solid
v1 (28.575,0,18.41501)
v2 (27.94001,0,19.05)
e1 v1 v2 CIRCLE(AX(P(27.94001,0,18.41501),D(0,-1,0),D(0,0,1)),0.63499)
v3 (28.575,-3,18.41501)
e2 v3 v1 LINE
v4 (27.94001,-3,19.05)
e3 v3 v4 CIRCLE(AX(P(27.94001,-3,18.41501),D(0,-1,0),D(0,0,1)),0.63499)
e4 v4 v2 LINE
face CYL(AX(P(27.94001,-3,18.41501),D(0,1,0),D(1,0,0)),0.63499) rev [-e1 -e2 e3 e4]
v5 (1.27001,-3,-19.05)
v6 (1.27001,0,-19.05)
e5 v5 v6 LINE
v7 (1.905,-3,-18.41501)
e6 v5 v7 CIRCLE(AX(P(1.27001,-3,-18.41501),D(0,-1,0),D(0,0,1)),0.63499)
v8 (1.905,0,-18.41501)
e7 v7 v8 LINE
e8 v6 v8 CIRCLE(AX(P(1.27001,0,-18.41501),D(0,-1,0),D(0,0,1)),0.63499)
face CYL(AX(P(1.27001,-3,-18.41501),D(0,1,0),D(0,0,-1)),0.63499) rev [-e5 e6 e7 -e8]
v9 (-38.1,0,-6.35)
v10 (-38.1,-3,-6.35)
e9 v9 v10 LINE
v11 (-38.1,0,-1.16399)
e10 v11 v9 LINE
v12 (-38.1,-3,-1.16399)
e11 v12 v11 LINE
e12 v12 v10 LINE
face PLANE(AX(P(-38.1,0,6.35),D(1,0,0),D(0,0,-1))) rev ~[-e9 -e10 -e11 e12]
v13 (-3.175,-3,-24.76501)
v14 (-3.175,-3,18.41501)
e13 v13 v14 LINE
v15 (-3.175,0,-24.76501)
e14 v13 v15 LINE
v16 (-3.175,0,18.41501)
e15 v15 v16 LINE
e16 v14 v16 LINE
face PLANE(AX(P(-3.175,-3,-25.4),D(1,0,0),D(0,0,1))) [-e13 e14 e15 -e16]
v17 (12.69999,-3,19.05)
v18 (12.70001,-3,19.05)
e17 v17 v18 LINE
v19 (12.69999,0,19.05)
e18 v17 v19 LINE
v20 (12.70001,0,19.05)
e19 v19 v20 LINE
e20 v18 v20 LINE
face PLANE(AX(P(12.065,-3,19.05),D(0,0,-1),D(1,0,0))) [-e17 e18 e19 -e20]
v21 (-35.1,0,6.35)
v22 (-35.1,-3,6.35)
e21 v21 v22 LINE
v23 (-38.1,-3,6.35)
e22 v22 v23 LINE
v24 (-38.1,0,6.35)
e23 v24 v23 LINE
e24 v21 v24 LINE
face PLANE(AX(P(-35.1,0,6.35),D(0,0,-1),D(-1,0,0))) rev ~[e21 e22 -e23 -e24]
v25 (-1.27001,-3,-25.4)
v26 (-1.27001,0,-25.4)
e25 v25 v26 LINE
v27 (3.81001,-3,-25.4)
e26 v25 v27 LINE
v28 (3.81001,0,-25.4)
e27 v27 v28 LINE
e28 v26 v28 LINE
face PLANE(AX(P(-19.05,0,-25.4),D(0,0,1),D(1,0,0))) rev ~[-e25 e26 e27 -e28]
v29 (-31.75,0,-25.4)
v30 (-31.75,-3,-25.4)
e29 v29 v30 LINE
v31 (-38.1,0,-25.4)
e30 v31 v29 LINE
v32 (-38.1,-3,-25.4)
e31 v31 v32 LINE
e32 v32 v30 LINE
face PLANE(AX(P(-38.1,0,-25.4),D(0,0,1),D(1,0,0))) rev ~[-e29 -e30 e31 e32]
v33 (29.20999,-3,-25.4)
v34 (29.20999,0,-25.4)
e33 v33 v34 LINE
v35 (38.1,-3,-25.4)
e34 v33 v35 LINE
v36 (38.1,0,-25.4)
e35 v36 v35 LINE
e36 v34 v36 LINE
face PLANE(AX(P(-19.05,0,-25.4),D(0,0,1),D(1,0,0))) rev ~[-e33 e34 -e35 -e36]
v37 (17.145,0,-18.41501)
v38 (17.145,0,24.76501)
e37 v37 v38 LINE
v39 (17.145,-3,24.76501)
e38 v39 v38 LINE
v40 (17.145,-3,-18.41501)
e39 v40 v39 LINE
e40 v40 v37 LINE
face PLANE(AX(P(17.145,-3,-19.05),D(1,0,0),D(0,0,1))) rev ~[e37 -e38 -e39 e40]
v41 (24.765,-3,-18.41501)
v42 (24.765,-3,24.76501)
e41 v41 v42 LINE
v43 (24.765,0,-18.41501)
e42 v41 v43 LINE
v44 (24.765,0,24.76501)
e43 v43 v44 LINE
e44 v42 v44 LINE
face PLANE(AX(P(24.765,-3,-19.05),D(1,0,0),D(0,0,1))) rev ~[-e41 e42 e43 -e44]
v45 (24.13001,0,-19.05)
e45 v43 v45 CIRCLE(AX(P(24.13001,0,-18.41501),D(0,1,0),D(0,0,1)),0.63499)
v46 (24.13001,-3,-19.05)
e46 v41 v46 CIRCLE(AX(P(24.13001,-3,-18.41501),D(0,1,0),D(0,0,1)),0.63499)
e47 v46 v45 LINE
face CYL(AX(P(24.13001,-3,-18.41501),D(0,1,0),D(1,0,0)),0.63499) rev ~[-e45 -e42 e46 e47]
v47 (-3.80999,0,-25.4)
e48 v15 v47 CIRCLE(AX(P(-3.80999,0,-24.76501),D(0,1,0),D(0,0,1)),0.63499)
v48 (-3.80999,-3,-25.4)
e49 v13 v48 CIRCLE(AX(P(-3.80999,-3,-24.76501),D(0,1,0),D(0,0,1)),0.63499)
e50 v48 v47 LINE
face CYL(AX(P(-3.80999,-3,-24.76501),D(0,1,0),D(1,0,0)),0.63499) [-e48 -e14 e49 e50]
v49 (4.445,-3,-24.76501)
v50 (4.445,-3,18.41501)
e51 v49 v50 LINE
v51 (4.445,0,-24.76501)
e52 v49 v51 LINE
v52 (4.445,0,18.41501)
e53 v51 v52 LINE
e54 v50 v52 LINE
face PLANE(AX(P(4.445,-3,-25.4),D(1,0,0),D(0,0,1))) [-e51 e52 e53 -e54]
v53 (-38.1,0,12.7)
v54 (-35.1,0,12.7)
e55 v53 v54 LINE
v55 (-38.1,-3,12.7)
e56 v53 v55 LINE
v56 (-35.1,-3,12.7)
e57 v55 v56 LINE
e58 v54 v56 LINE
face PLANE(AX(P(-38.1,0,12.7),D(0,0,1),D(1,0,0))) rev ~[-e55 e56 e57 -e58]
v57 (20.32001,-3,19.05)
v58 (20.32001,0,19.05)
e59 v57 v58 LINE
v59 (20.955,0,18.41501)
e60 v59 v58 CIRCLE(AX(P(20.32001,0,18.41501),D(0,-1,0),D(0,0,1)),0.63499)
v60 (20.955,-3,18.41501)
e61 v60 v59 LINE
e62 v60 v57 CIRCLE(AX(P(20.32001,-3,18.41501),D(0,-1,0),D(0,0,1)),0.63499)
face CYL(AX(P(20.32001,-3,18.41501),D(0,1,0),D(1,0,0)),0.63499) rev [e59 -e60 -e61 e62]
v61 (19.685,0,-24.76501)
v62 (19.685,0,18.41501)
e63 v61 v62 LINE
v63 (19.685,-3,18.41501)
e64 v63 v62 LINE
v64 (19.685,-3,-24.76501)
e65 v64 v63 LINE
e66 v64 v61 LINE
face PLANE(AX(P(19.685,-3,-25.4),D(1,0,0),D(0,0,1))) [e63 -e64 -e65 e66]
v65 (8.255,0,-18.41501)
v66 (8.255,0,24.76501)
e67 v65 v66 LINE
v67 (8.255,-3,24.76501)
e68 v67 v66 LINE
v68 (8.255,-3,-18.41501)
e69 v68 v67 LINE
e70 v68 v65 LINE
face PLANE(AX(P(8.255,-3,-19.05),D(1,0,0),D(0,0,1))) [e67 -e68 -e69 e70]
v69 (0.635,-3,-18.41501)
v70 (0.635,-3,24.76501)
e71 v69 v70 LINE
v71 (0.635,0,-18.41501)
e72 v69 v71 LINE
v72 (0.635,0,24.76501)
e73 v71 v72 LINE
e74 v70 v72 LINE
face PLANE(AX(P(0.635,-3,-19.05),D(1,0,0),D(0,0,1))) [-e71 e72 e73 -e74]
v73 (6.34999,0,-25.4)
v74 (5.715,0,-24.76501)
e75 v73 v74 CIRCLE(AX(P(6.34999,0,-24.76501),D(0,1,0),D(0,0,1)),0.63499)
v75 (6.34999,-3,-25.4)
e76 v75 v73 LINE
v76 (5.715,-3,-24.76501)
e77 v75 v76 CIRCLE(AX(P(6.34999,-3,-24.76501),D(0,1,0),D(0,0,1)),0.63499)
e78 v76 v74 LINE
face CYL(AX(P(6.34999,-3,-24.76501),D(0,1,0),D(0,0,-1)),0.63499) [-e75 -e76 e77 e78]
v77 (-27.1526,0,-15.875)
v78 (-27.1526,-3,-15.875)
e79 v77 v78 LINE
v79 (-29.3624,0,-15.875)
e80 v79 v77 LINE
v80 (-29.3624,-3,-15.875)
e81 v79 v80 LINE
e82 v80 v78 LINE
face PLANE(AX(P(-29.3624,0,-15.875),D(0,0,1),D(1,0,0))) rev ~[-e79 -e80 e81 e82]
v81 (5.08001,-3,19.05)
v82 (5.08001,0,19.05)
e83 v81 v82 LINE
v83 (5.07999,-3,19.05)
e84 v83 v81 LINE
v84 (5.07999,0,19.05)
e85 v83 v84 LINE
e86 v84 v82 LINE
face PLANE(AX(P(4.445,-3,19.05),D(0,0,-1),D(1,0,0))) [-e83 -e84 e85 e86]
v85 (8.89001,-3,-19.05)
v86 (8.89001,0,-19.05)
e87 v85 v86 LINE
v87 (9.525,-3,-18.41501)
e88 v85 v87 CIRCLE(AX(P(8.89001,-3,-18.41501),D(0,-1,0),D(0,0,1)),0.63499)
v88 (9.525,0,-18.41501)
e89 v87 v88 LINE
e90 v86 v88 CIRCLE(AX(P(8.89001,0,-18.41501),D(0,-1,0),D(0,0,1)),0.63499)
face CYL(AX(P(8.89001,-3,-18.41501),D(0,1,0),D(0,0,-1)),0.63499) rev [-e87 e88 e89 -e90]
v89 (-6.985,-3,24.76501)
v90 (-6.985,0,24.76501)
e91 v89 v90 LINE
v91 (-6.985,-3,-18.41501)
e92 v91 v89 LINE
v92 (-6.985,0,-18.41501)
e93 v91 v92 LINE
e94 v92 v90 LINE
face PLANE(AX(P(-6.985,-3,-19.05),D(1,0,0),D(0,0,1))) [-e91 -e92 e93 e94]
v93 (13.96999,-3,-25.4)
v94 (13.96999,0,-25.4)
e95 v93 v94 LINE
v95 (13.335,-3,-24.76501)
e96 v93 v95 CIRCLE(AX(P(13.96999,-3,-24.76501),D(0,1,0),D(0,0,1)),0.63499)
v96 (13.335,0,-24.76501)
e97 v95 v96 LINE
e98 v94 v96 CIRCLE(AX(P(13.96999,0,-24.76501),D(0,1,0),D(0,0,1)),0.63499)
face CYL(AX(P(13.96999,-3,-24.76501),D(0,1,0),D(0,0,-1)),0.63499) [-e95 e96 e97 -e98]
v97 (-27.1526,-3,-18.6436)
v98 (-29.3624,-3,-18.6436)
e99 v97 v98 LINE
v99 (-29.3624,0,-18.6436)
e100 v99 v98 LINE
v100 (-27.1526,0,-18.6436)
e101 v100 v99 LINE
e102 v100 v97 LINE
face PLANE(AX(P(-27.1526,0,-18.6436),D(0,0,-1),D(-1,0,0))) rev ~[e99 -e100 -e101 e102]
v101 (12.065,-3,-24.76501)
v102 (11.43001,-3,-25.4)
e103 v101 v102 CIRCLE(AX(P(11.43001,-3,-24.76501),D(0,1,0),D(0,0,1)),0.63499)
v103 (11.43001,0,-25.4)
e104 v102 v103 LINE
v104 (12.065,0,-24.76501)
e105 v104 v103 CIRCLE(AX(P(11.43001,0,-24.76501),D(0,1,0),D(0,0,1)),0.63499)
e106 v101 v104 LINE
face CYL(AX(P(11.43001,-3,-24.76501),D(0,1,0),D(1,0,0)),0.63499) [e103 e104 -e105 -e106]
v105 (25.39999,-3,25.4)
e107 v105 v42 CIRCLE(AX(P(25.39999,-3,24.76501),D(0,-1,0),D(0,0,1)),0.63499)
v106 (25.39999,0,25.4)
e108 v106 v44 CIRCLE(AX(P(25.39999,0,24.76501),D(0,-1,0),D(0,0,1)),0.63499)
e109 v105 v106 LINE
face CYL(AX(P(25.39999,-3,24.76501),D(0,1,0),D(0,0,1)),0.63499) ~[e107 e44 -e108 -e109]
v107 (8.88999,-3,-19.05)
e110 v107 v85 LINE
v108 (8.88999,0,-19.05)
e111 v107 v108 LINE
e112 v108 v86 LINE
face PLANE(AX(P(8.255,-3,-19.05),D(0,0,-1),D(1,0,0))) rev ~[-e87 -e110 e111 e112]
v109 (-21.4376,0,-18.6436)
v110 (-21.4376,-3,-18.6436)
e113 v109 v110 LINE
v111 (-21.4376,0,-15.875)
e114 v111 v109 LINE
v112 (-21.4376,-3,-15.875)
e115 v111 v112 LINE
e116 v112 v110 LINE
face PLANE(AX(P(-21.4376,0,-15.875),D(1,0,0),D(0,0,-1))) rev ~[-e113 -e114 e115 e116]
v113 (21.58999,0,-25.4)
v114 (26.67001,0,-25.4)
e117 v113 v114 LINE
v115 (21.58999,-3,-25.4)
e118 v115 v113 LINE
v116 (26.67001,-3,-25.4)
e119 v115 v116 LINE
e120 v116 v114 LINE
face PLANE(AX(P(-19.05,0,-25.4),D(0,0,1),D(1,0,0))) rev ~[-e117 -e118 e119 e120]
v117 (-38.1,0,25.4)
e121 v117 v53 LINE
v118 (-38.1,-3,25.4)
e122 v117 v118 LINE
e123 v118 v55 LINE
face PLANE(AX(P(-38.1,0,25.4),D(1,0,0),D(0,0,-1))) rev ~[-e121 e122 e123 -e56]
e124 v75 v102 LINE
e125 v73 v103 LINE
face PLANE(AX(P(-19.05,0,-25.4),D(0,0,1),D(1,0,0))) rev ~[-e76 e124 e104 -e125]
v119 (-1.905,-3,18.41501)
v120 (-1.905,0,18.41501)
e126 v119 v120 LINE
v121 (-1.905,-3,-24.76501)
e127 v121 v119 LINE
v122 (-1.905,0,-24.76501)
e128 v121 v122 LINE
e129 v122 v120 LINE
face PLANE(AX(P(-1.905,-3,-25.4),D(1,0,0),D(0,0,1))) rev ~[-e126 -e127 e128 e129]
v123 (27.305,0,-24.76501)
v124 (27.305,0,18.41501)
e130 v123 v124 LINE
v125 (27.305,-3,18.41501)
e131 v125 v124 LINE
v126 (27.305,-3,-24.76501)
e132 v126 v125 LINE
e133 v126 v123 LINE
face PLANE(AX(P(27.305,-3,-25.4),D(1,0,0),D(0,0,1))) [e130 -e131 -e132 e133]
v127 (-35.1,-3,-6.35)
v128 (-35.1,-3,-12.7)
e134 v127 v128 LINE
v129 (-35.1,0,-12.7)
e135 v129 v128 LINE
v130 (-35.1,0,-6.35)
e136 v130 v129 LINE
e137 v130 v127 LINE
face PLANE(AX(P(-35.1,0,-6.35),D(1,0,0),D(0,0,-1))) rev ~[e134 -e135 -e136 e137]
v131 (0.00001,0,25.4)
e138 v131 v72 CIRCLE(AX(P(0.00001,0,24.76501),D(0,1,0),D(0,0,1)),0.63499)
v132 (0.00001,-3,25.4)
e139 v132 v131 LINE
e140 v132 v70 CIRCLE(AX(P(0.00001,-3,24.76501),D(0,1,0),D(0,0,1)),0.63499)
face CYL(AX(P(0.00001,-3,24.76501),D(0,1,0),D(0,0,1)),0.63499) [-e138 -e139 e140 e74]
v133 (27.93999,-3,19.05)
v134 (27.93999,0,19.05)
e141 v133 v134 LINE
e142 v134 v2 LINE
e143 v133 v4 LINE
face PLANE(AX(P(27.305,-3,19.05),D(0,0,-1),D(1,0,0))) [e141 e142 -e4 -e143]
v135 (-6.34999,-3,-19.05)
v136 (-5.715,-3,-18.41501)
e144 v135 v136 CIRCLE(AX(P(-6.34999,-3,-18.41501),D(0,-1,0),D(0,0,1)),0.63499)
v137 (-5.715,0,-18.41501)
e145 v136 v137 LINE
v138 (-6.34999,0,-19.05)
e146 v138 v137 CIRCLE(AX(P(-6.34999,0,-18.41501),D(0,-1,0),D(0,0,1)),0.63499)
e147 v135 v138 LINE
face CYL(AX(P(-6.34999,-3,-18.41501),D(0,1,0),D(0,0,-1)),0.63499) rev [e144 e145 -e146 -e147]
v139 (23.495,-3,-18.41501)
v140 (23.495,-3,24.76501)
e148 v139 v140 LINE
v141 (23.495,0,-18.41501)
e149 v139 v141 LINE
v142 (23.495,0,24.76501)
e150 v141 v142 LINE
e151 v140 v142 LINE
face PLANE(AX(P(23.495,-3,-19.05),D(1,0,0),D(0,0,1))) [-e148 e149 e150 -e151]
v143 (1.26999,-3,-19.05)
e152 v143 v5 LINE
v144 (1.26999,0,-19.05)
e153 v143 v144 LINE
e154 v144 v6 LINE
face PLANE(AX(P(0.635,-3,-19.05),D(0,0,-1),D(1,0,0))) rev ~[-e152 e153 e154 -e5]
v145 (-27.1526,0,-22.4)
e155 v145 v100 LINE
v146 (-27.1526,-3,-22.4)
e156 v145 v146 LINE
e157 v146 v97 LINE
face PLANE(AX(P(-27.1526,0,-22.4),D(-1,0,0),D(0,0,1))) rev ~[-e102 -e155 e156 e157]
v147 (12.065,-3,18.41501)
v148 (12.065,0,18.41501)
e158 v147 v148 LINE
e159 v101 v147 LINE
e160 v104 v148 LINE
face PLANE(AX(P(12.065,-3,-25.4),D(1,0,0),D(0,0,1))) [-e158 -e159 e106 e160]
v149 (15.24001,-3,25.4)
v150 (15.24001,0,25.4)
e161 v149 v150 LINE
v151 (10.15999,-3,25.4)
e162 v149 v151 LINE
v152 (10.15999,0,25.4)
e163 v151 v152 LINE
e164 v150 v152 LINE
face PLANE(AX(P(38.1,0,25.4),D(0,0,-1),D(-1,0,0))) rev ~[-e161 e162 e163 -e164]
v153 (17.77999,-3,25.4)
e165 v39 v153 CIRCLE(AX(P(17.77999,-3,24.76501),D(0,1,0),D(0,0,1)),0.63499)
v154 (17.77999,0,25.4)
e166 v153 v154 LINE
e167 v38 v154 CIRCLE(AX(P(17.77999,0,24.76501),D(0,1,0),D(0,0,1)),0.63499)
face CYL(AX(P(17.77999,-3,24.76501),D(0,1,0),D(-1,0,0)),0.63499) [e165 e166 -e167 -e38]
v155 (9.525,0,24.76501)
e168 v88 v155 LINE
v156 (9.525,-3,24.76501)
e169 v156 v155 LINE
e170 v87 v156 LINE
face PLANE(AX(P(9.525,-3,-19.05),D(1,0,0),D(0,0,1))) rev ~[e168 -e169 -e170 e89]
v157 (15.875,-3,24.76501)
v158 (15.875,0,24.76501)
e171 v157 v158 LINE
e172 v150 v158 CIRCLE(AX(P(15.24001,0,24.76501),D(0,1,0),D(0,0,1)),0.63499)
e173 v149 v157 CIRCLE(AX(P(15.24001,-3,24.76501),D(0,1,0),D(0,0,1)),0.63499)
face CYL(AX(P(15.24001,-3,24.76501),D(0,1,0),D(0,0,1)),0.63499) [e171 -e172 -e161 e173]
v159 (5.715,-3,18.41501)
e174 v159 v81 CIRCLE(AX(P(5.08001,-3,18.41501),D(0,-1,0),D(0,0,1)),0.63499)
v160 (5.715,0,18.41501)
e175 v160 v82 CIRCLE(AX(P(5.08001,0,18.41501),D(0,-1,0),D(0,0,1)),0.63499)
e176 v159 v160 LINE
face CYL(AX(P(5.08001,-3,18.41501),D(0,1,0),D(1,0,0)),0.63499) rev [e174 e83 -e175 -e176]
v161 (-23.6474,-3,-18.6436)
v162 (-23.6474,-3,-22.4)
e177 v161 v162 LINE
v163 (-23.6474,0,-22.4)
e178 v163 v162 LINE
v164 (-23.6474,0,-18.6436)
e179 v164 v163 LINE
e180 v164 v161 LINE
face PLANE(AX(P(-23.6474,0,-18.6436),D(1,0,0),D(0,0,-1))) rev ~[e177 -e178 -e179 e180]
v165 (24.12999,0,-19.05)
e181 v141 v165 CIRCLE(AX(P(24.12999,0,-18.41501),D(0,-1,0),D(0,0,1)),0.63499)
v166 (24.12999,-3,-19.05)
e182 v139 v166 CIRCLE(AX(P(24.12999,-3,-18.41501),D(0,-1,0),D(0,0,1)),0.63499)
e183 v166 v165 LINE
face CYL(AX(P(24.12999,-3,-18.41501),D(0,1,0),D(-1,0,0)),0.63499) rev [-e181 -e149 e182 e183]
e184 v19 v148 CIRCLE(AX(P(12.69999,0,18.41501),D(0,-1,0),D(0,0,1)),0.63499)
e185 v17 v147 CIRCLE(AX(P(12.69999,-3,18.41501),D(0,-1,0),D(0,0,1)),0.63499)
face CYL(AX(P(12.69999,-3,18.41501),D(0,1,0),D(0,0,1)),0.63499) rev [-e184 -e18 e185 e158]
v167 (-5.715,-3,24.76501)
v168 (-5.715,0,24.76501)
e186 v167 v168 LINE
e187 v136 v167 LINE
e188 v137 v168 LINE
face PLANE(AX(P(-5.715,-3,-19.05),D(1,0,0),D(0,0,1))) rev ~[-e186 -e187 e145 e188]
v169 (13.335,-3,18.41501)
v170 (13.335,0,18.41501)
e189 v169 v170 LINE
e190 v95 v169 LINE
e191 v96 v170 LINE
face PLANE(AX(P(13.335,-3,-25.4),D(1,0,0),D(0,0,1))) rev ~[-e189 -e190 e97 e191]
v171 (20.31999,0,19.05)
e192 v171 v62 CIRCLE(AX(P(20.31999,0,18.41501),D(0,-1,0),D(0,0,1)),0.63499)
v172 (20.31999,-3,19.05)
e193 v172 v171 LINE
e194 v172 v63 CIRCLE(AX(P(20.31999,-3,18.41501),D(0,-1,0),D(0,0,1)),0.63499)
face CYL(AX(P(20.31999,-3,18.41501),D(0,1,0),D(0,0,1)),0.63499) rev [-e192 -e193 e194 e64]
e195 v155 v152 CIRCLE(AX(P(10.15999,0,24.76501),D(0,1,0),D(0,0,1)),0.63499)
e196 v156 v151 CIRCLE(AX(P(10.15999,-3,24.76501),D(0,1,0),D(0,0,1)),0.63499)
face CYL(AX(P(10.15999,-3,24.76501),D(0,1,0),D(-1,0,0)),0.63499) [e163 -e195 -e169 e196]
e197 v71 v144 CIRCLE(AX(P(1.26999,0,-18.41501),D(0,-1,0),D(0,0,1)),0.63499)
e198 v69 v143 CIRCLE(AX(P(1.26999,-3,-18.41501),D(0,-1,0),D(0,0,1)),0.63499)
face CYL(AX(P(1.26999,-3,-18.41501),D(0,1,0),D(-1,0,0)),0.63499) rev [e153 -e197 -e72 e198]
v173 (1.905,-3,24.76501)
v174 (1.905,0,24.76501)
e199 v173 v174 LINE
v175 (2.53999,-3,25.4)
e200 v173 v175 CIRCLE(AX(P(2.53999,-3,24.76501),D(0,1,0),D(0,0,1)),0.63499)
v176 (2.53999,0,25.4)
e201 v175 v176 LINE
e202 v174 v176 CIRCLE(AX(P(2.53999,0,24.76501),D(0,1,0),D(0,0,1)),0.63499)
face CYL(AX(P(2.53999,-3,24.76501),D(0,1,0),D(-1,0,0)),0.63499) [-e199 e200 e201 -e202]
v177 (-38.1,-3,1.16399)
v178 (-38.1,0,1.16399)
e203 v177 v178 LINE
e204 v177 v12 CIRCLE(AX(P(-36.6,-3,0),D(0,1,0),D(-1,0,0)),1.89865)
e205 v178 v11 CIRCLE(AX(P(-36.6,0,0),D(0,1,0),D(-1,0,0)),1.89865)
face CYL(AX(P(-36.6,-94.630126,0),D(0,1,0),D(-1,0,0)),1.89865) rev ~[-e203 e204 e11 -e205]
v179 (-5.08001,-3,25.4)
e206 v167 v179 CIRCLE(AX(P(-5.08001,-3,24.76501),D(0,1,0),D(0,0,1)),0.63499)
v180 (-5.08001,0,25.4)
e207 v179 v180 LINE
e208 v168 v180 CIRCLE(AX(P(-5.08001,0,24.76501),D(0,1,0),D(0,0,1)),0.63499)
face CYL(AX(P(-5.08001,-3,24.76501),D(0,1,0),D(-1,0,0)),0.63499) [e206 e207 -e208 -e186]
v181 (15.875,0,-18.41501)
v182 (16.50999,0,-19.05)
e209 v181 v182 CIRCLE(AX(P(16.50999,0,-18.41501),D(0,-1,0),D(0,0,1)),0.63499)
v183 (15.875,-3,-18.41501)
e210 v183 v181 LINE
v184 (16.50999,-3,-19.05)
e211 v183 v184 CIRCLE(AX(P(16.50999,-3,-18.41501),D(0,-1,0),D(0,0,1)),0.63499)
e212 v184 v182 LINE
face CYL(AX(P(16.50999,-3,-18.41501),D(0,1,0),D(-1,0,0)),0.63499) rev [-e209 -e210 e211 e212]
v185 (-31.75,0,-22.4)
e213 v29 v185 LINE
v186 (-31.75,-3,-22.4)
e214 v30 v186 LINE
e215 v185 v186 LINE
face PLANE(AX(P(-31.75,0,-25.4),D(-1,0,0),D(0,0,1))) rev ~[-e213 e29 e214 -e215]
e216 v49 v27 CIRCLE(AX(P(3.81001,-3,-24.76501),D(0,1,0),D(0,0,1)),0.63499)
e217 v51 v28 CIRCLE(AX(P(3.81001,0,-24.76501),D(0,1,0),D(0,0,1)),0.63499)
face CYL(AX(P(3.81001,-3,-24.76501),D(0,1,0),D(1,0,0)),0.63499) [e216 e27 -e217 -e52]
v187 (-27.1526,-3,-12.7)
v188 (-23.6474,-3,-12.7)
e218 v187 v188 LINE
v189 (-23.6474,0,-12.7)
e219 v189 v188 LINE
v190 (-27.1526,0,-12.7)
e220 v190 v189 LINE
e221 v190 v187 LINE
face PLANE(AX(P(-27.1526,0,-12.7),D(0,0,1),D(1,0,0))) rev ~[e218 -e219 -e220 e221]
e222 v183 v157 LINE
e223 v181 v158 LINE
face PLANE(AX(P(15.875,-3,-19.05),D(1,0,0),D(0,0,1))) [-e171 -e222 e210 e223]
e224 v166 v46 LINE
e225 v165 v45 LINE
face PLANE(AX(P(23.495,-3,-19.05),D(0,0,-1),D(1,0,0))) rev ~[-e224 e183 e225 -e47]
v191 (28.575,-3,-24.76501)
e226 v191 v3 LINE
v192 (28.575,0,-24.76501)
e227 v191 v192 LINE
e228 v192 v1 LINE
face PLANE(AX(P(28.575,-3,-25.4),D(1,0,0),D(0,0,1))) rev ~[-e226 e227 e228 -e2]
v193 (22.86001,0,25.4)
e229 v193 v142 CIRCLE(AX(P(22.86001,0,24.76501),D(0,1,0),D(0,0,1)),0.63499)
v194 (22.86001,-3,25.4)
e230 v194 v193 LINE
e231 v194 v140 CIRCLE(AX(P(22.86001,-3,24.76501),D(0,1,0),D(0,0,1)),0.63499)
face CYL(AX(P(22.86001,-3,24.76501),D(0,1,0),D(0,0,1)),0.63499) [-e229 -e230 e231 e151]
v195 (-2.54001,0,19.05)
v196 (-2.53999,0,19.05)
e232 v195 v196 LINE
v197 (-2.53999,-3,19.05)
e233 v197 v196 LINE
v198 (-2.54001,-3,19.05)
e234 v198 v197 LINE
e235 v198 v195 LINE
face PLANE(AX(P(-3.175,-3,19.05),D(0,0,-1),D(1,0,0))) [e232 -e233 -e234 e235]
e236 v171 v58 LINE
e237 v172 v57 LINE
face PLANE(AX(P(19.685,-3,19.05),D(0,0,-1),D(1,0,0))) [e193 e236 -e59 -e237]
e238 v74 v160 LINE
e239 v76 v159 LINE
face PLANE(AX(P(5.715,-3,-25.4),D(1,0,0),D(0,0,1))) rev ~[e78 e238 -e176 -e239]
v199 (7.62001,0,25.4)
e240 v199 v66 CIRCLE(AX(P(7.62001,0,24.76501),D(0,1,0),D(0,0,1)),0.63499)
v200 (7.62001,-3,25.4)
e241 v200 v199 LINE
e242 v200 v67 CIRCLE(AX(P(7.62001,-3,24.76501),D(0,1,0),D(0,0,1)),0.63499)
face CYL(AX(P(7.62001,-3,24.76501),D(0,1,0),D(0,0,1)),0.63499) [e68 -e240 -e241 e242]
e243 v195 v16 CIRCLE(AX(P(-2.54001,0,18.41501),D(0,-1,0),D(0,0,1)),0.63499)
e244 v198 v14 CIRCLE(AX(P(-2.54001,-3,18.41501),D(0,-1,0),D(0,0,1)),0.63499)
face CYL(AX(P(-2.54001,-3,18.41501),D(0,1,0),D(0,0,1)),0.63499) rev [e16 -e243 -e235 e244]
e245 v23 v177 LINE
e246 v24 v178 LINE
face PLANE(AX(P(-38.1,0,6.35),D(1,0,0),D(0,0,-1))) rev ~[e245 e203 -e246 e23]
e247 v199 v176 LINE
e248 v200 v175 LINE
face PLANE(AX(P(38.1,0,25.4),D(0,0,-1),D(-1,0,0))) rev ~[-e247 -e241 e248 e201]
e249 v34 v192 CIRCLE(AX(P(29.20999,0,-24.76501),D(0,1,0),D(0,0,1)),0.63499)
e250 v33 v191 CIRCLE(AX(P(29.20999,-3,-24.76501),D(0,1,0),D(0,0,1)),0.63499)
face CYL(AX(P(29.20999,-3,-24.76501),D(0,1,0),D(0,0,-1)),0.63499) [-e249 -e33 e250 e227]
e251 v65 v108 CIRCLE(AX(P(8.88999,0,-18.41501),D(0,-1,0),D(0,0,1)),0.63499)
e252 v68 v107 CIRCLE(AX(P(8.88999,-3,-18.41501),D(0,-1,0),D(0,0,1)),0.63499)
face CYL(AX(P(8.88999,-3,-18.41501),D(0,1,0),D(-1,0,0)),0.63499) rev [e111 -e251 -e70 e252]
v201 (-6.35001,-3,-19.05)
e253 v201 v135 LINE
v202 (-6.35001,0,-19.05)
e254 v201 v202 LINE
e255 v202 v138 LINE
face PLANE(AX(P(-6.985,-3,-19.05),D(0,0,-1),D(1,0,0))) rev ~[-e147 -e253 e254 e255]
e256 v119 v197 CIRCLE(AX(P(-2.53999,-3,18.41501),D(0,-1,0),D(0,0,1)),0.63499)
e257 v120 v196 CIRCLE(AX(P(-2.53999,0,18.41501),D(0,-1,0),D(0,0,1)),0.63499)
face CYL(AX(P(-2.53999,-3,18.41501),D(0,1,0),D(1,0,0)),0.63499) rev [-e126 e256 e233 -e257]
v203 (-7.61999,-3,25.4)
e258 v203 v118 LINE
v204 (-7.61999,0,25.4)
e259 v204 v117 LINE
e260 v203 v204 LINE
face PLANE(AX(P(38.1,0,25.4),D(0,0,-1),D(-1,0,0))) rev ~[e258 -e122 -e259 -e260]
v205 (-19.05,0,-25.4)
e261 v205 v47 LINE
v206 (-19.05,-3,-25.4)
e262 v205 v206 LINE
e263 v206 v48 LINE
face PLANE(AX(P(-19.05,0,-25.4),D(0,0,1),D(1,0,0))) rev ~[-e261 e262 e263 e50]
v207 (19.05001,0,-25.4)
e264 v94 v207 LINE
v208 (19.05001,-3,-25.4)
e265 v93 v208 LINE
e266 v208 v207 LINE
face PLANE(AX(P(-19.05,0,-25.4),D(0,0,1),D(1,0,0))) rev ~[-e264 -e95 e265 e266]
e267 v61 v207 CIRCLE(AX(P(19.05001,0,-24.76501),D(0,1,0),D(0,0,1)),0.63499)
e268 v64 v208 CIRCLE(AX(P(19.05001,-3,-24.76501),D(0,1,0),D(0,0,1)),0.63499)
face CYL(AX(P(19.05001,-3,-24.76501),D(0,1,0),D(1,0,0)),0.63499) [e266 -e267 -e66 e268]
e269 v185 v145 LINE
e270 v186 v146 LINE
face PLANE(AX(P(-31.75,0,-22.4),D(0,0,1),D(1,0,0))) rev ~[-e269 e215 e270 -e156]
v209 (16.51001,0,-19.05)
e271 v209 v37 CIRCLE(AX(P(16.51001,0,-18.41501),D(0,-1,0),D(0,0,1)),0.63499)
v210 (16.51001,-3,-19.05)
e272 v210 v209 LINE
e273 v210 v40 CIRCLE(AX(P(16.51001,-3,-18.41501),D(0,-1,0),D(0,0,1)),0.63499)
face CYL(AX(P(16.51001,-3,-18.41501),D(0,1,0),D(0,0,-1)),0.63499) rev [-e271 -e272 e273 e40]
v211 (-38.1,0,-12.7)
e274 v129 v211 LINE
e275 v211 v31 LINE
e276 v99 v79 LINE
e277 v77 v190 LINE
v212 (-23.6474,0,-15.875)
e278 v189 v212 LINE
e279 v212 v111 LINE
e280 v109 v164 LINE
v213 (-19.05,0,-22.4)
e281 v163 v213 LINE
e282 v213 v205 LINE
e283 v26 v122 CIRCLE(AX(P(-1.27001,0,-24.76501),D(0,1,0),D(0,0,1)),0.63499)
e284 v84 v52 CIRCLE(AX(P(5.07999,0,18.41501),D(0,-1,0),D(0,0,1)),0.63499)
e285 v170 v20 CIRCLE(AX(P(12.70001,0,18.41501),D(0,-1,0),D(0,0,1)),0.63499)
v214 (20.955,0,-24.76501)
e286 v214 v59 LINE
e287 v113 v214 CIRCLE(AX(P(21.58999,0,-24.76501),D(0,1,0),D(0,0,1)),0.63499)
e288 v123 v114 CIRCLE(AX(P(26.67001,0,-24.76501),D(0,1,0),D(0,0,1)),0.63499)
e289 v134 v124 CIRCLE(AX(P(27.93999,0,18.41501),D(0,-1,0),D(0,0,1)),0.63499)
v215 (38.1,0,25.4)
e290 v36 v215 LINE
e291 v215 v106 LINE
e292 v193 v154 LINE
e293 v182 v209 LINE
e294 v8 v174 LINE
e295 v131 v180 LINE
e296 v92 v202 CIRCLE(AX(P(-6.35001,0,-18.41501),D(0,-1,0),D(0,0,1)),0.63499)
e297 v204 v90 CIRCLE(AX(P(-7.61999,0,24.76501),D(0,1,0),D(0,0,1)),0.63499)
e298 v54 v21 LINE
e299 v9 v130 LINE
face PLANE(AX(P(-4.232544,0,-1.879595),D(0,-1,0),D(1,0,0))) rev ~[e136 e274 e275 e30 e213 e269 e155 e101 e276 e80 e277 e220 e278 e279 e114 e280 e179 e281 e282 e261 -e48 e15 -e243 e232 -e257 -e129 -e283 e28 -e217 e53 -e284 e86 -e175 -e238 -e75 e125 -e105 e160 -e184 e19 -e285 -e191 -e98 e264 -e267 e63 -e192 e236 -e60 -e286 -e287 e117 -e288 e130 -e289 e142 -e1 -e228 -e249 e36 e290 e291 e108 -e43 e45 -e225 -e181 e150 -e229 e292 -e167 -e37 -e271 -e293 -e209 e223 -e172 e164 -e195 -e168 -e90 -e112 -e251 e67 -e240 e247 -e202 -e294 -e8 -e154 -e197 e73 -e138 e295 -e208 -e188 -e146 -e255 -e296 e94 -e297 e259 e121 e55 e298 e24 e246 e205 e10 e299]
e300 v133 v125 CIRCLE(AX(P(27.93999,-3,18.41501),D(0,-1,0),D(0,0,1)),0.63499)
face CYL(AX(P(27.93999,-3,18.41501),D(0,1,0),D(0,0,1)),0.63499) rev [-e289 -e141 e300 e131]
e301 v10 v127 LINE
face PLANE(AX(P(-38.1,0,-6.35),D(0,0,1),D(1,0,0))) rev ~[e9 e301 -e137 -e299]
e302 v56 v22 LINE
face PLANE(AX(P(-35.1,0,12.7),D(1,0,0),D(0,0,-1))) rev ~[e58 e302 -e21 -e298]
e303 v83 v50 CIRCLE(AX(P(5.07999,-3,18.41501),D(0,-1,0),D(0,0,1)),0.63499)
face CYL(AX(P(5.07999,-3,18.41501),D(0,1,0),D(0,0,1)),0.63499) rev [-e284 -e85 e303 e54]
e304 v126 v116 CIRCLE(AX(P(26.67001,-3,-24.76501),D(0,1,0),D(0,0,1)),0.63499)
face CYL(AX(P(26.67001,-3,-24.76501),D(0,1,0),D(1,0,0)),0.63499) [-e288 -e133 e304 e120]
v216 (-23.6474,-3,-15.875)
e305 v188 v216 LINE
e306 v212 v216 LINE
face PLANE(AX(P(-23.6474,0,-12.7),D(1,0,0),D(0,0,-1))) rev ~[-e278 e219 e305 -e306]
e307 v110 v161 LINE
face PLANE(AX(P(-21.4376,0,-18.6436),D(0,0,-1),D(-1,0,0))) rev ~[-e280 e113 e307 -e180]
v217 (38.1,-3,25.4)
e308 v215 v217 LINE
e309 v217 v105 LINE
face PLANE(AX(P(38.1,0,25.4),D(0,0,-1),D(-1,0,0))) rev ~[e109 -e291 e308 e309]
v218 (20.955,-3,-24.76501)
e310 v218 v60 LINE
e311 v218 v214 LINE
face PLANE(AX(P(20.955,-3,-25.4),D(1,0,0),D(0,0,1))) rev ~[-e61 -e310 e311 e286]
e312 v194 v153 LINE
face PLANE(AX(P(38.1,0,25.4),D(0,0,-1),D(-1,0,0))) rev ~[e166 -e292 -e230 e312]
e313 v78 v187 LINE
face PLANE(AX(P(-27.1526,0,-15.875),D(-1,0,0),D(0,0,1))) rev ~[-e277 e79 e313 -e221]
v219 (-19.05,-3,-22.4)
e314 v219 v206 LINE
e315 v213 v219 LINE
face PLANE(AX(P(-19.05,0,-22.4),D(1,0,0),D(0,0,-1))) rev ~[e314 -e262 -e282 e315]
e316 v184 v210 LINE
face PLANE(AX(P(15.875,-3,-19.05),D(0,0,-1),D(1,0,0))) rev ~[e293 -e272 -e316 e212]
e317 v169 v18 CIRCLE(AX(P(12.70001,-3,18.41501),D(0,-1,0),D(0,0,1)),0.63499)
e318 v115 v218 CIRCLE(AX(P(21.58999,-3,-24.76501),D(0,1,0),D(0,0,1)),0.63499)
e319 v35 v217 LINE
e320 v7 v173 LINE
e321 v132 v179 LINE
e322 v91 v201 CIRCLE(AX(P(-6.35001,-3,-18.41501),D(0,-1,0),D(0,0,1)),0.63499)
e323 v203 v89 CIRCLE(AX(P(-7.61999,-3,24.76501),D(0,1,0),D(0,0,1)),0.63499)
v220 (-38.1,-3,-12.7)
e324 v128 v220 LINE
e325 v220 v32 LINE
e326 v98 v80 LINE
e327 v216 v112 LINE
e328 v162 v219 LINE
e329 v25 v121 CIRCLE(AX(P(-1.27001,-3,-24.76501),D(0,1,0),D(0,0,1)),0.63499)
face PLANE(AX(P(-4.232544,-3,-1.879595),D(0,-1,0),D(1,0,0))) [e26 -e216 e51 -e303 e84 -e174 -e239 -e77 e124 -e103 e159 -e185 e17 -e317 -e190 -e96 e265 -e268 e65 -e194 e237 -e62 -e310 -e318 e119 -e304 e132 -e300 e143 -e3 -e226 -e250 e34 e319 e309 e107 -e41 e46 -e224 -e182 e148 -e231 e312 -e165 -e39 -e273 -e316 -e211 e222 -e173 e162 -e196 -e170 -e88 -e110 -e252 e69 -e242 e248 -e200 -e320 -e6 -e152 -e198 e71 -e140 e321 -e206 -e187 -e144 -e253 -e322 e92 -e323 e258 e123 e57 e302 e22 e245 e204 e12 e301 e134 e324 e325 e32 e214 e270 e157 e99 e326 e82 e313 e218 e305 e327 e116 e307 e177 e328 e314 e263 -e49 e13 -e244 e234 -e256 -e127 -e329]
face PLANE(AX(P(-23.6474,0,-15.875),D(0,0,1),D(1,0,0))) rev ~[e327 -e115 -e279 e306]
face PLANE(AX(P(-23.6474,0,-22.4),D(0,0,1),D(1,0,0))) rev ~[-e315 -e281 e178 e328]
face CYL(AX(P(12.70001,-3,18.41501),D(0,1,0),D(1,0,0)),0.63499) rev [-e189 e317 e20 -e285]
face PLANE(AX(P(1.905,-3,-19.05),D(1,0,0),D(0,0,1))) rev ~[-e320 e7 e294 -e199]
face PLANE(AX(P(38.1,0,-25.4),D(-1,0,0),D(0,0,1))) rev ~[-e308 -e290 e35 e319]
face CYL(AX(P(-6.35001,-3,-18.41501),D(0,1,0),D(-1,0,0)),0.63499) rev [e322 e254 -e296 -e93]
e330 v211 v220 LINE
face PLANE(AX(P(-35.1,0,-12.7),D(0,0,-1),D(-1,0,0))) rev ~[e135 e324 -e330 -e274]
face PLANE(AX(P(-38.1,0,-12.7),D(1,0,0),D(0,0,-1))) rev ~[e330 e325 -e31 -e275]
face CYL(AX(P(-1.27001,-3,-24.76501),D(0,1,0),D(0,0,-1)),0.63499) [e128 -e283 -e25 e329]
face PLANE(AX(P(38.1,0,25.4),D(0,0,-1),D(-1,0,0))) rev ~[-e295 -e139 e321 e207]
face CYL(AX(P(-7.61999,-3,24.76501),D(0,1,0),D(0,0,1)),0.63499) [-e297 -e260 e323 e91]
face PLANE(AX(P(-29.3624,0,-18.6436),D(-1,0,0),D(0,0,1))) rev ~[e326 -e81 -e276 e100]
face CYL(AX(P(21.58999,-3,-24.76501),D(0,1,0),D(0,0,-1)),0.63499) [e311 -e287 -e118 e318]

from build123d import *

# Parameters (mm, degrees)
F1_DEPTH = 3
F3_D     = 3.7973
F4_W     = 1.27
F4_H     = 44.4500002354
F4_H_2   = 44.45
F5_DEPTH = 3.001
F6_R     = 0.63499


# Not quite as in the source:
# - a fillet or chamfer is up to 0.001 mm smaller than in the source, because OpenCascade refuses the exact size


with BuildPart() as f1:
    # F0 (on Front) → F1 (new body)
    with BuildSketch(Plane.XZ):
        Polygon((38.1, 25.4), (-38.1, 25.4), (-38.1, 12.7), (-35.1, 12.7), (-35.1, 6.35), (-38.1, 6.35), (-38.1, -6.35), (-35.1, -6.35), (-35.1, -12.7), (-38.1, -12.7), (-38.1, -25.4), (-31.75, -25.4), (-31.75, -22.4), (-27.1526, -22.4), (-27.1526, -18.6436), (-29.3624, -18.6436), (-29.3624, -15.875), (-27.1526, -15.875), (-27.1526, -12.7), (-23.6474, -12.7), (-23.6474, -15.875), (-21.4376, -15.875), (-21.4376, -18.6436), (-23.6474, -18.6436), (-23.6474, -22.4), (-19.05, -22.4), (-19.05, -25.4), (38.1, -25.4), align=None)
    extrude(amount=F1_DEPTH)

    # F3 (through all)
    with Locations(Plane.XZ.offset(3)):
        with Locations((-36.6, 0)):
            Hole(F3_D / 2)

    # F4 (on face) → F5 (cut, through all)
    with BuildSketch(Plane.XZ.offset(3)):
        with Locations((-6.3499999233, 3.1749998823)):
            Rectangle(F4_W, F4_H)
        with Locations((-2.5399999233, -3.175)):
            Rectangle(F4_W, F4_H_2)
        with Locations((5.0800000767, -3.175)):
            Rectangle(F4_W, F4_H_2)
        with Locations((1.2700000767, 3.1749998823)):
            Rectangle(F4_W, F4_H)
        with Locations((12.7000000767, -3.175)):
            Rectangle(F4_W, F4_H_2)
        with Locations((8.8900000767, 3.1749998823)):
            Rectangle(F4_W, F4_H)
        with Locations((20.3200000767, -3.175)):
            Rectangle(F4_W, F4_H_2)
        with Locations((16.5100000767, 3.1749998823)):
            Rectangle(F4_W, F4_H)
        with Locations((27.9400000767, -3.175)):
            Rectangle(F4_W, F4_H_2)
        with Locations((24.1300000767, 3.1749998823)):
            Rectangle(F4_W, F4_H)
    extrude(amount=-F5_DEPTH, mode=Mode.SUBTRACT)

    # F6 (radius 0.635 in the source; OpenCascade refuses exactly that, so slightly less here)
    f6_edges = [f1.edges().sort_by_distance(p)[0] for p in [
        (-6.985, -1.5, -19.05),
        (-5.715, -1.5, -19.05),
        (0.635, -1.5, -19.05),
        (1.905, -1.5, -19.05),
        (9.525, -1.5, -19.05),
        (8.255, -1.5, -19.05),
        (15.875, -1.5, -19.05),
        (17.145, -1.5, -19.05),
        (24.765, -1.5, -19.05),
        (23.495, -1.5, -19.05),
        (-3.175, -1.5, 19.05),
        (4.445, -1.5, 19.05),
        (12.065, -1.5, 19.05),
        (19.685, -1.5, 19.05),
        (27.305, -1.5, 19.05),
        (-1.905, -1.5, 19.05),
        (5.715, -1.5, 19.05),
        (13.335, -1.5, 19.05),
        (20.955, -1.5, 19.05),
        (28.575, -1.5, 19.05),
        (-1.905, -1.5, -25.4),
        (4.445, -1.5, -25.4),
        (5.715, -1.5, -25.4),
        (12.065, -1.5, -25.4),
        (13.335, -1.5, -25.4),
        (19.685, -1.5, -25.4),
        (20.955, -1.5, -25.4),
        (27.305, -1.5, -25.4),
        (28.575, -1.5, -25.4),
        (-6.985, -1.5, 25.4),
        (-5.715, -1.5, 25.4),
        (-3.175, -1.5, -25.4),
        (0.635, -1.5, 25.4),
        (1.905, -1.5, 25.4),
        (8.255, -1.5, 25.4),
        (9.525, -1.5, 25.4),
        (15.875, -1.5, 25.4),
        (17.145, -1.5, 25.4),
        (23.495, -1.5, 25.4),
        (24.765, -1.5, 25.4),
    ]]
    fillet(f6_edges, radius=F6_R)


solid = f1.part
